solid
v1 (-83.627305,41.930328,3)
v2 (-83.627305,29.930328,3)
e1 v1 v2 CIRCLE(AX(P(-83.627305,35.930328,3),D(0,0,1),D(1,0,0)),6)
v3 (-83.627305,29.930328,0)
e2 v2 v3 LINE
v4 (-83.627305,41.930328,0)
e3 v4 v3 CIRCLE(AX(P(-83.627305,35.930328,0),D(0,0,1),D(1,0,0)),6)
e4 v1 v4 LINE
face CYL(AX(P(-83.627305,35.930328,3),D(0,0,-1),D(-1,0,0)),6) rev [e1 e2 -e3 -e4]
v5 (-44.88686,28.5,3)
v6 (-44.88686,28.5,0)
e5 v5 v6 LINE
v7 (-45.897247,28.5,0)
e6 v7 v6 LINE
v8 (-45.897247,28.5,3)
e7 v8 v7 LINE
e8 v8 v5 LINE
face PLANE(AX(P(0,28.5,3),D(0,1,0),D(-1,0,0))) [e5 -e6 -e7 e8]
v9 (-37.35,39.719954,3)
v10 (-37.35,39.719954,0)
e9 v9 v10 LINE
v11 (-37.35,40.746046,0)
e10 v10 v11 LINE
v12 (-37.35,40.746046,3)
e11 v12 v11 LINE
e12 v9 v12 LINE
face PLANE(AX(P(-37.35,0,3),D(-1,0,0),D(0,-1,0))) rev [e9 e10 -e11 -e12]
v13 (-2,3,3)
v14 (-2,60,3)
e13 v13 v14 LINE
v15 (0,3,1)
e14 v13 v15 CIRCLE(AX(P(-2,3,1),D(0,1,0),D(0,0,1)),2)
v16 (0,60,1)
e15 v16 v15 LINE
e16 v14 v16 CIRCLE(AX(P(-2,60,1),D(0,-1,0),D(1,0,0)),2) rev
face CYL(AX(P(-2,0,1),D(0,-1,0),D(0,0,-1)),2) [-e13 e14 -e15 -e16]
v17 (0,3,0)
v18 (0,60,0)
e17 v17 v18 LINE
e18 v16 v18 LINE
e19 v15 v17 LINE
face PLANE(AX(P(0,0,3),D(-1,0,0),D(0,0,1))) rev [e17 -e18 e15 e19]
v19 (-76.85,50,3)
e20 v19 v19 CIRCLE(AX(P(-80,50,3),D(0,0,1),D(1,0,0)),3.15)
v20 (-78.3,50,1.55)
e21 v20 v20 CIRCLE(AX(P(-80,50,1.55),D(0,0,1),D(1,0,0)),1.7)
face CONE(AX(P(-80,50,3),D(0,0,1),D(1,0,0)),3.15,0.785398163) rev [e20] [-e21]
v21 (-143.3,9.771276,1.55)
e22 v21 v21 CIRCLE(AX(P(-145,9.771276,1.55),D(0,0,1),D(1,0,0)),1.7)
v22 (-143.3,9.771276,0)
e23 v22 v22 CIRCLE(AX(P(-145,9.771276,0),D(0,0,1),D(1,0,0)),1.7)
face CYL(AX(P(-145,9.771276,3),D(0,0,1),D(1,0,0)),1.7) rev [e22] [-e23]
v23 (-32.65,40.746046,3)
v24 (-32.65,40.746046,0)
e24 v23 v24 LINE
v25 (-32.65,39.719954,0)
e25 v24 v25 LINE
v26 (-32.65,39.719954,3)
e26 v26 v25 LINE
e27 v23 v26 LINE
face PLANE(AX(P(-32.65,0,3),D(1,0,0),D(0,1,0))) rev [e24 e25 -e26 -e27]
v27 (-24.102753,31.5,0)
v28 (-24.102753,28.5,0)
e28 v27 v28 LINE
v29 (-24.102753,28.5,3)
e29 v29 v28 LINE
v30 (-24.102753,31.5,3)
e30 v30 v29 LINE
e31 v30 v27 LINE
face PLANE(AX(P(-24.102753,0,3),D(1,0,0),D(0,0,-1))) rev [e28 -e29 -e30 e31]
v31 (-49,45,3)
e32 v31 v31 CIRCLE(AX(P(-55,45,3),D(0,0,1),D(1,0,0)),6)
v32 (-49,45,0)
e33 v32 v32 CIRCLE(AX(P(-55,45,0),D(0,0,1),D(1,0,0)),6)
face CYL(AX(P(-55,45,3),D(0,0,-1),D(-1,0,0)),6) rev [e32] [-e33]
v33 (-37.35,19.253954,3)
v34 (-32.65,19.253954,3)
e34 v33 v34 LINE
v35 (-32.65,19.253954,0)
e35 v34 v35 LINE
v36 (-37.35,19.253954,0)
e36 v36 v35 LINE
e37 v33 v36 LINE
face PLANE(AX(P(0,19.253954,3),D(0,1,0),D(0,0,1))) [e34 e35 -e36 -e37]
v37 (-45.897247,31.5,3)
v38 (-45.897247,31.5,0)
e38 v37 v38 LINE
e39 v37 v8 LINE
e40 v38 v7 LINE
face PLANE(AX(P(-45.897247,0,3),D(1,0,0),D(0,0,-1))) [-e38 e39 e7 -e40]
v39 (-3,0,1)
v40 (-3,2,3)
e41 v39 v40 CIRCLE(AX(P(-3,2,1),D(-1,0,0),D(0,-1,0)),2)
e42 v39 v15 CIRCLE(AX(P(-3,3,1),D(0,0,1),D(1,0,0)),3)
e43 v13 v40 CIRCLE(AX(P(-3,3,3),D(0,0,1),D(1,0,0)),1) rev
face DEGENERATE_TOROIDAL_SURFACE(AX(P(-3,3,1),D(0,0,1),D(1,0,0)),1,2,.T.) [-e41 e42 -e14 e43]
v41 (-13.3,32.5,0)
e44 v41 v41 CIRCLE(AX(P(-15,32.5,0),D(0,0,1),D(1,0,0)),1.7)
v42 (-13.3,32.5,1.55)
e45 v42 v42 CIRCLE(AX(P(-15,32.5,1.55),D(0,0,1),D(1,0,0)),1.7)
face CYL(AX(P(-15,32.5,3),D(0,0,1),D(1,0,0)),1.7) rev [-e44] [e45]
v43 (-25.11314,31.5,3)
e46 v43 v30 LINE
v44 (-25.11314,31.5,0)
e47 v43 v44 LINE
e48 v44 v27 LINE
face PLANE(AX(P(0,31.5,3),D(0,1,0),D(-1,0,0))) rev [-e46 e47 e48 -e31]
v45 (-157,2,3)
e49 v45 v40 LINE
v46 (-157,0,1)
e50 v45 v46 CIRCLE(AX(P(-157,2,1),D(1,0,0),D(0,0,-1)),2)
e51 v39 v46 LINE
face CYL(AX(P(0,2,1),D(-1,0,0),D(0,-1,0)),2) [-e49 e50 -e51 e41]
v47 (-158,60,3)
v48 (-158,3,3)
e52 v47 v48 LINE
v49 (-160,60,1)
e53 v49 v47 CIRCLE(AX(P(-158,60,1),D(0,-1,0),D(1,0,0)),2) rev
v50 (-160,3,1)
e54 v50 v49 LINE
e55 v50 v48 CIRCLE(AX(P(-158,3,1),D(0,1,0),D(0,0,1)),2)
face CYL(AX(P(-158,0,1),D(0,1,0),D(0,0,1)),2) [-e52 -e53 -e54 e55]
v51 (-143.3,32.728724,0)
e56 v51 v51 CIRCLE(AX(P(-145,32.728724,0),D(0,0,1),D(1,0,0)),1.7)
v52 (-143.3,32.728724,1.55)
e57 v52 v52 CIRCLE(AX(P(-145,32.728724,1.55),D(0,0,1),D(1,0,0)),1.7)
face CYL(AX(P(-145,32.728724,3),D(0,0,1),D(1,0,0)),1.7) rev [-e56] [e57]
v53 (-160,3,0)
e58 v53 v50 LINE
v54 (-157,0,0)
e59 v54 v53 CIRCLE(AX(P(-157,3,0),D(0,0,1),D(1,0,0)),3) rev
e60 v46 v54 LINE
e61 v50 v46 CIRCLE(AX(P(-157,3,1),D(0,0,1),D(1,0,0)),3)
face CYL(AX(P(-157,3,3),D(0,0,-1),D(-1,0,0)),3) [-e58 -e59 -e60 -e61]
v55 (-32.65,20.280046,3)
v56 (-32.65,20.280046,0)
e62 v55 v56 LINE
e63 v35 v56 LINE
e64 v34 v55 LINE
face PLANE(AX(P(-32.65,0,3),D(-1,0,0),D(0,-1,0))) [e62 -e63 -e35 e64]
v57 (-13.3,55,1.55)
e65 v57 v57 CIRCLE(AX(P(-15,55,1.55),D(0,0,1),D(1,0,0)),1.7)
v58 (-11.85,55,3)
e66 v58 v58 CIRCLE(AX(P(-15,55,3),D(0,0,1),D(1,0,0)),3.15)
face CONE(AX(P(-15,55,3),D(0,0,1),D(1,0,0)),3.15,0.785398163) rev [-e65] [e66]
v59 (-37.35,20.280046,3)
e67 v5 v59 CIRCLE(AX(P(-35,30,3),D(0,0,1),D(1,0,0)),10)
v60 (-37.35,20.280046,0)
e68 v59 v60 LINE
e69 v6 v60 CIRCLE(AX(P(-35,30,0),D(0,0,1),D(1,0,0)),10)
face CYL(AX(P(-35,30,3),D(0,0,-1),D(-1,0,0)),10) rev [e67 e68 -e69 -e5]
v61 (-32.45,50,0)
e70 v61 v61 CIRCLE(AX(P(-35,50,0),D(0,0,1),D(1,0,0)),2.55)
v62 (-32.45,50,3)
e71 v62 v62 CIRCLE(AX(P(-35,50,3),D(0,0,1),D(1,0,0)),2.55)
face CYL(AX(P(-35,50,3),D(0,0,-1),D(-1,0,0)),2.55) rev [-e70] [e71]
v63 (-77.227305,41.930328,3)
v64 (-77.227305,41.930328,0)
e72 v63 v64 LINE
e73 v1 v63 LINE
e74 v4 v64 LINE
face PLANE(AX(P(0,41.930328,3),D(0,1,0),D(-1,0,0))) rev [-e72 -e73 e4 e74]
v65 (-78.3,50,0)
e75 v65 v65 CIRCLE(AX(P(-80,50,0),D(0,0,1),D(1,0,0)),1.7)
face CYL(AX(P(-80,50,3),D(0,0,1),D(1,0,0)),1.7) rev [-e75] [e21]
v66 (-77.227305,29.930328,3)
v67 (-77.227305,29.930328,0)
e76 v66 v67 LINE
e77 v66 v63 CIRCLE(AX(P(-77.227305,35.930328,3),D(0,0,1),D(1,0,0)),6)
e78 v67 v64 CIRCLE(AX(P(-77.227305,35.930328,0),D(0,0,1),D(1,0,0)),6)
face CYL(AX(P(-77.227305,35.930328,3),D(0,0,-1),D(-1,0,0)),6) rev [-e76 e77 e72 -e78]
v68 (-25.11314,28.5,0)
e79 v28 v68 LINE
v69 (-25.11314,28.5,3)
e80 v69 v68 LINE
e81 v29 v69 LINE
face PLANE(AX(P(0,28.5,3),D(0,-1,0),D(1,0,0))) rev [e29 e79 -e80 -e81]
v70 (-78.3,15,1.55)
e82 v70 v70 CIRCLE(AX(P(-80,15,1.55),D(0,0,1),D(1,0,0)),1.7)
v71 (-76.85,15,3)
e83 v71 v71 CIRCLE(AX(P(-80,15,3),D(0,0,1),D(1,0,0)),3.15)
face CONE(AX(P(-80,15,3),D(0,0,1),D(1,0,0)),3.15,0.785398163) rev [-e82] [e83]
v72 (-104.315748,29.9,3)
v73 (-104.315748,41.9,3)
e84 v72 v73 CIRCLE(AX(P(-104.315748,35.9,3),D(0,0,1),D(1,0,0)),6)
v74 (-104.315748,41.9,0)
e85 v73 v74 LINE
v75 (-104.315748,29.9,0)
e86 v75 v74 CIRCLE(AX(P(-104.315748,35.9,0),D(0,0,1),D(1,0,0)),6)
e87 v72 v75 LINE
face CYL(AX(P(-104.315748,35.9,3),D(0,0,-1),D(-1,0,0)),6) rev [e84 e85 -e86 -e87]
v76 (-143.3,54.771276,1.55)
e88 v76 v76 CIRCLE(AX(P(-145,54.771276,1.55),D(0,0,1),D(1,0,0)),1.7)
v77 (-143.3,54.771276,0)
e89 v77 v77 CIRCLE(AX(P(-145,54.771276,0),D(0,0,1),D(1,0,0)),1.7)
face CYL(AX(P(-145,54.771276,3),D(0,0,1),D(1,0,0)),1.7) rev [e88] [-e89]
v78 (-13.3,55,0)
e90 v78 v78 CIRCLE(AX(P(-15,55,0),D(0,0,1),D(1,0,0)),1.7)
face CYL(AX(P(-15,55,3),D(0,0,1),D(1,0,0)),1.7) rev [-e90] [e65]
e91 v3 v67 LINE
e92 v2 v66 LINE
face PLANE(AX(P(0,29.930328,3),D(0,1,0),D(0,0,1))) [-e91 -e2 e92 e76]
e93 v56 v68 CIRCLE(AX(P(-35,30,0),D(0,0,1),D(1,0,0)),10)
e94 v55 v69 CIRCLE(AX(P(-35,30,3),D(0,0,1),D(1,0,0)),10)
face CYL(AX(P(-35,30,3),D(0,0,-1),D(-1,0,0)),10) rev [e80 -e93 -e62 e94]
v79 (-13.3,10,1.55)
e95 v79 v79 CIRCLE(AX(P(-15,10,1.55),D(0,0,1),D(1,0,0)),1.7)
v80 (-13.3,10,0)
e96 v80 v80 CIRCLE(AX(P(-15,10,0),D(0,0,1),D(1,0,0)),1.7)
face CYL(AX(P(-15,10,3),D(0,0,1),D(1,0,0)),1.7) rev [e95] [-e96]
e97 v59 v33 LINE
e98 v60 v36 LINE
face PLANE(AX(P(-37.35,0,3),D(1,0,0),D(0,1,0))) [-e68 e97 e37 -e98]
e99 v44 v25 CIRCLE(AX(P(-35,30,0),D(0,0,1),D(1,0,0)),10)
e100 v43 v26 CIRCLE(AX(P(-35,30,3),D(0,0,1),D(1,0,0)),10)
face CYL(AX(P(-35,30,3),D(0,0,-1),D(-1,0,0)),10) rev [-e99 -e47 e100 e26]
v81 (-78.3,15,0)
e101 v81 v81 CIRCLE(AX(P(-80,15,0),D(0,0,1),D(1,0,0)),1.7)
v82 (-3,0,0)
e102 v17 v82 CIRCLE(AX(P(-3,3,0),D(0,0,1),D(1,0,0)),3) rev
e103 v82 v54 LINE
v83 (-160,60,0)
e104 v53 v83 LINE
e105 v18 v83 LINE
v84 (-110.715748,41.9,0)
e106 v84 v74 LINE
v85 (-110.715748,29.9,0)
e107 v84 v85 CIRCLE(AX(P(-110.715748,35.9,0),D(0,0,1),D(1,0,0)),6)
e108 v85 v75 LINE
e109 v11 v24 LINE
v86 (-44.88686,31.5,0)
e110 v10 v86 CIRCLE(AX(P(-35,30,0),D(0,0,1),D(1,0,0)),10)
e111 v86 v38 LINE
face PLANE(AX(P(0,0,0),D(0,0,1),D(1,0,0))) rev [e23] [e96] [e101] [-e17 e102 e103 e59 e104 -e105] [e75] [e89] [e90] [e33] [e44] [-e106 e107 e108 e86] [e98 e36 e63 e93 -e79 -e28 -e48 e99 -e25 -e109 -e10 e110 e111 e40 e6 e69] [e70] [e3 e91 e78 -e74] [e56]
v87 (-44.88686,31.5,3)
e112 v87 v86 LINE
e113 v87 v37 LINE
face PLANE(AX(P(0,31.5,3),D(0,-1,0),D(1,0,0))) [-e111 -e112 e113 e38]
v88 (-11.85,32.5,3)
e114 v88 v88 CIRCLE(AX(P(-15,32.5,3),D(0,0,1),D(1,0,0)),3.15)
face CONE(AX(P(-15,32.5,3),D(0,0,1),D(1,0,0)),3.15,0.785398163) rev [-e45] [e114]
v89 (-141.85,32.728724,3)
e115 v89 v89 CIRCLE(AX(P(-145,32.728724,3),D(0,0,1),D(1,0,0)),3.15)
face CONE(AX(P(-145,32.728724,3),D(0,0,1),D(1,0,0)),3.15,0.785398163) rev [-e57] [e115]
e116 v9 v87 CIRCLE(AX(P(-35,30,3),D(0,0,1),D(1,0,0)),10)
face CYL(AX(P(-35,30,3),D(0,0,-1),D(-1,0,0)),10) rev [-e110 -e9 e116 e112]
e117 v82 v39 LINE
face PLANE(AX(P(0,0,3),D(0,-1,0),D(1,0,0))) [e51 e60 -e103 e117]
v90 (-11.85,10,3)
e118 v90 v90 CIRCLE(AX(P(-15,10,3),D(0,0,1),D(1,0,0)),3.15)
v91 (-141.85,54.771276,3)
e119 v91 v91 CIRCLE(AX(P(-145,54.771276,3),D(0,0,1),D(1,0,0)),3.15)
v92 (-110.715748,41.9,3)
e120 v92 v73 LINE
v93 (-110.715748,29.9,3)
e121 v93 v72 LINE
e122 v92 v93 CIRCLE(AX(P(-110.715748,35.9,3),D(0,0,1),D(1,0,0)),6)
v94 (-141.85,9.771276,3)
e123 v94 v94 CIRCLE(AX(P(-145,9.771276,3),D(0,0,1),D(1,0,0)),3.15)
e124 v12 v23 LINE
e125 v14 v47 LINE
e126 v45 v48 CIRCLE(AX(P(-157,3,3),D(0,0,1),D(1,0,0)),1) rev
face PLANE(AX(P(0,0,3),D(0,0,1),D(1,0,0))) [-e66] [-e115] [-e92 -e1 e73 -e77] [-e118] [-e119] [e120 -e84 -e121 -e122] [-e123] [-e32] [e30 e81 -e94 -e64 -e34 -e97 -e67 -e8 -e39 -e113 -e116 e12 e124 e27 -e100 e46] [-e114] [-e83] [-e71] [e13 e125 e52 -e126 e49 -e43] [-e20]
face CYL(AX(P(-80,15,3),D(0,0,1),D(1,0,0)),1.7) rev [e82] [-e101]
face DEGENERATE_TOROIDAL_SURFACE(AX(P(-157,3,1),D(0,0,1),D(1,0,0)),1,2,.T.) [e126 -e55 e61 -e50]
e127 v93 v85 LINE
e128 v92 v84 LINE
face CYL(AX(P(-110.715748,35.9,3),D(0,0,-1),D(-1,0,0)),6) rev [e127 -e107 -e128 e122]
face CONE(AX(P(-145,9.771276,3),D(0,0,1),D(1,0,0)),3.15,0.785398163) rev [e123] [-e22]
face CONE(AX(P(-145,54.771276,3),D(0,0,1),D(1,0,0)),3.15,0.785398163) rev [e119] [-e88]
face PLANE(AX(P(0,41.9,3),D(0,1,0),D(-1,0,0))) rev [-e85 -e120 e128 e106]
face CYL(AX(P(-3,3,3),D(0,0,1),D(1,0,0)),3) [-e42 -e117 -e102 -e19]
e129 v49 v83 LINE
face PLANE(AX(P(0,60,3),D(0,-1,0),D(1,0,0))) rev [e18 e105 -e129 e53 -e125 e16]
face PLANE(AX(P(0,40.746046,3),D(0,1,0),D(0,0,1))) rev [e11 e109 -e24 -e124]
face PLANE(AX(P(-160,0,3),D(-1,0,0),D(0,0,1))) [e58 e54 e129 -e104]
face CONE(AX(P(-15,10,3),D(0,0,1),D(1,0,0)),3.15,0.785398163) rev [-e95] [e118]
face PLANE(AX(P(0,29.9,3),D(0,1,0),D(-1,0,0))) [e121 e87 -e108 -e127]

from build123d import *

# Parameters (mm, degrees)
SKETCH11_W                                     = 160
SKETCH11_H                                     = 60
SKETCH11_R                                     = 2.55
SKETCH11_R_2                                   = 6
BOSS_EXTRUDE1_DEPTH                            = 3
FILLET1_R                                      = 2
FILLET3_R                                      = 3
CSK_FOR_M3_FLAT_HEAD_MACHINE_SCREW1_AT_2_COUNT = 2
CSK_FOR_M3_FLAT_HEAD_MACHINE_SCREW1_AT_2_PITCH = 22.042551394
CSK_FOR_M3_FLAT_HEAD_MACHINE_SCREW1_AT_3_COUNT = 2
CSK_FOR_M3_FLAT_HEAD_MACHINE_SCREW1_AT_3_PITCH = 45
CSK_FOR_M3_FLAT_HEAD_MACHINE_SCREW1_AT_4_COUNT = 2
CSK_FOR_M3_FLAT_HEAD_MACHINE_SCREW1_AT_4_PITCH = 137.493516675
CSK_FOR_M3_FLAT_HEAD_MACHINE_SCREW1_AT_5_COUNT = 2
CSK_FOR_M3_FLAT_HEAD_MACHINE_SCREW1_AT_5_PITCH = 131.893933603
CSK_FOR_M3_FLAT_HEAD_MACHINE_SCREW1_AT_6_COUNT = 2
CSK_FOR_M3_FLAT_HEAD_MACHINE_SCREW1_AT_6_PITCH = 130.000201211
CSK_FOR_M3_FLAT_HEAD_MACHINE_SCREW1_AT_7_COUNT = 2
CSK_FOR_M3_FLAT_HEAD_MACHINE_SCREW1_AT_7_PITCH = 65.174880681
CSK_FOR_M3_FLAT_HEAD_MACHINE_SCREW1_AT_8_COUNT = 2
CSK_FOR_M3_FLAT_HEAD_MACHINE_SCREW1_AT_8_PITCH = 76.202062771


with BuildPart() as part:
    # Sketch11 → Boss-Extrude1 (new body)
    with BuildSketch(Plane.XY):
        with Locations((-80, 30)):
            Rectangle(SKETCH11_W, SKETCH11_H)
        with Locations((-35, 50)):
            Circle(SKETCH11_R, mode=Mode.SUBTRACT)
        with Locations((-55, 45)):
            Circle(SKETCH11_R_2, mode=Mode.SUBTRACT)
        with BuildLine():
            Line((-44.886859967, 31.5), (-45.897247359, 31.5))
            Line((-45.897247359, 31.5), (-45.897247359, 28.5))
            Line((-45.897247359, 28.5), (-44.886859967, 28.5))
            ThreePointArc((-44.886859967, 28.5), (-42.370691635, 23.241826814), (-37.35, 20.280046296))
            Line((-37.35, 20.280046296), (-37.35, 19.253954216))
            Line((-37.35, 19.253954216), (-32.65, 19.253954216))
            Line((-32.65, 19.253954216), (-32.65, 20.280046296))
            ThreePointArc((-32.65, 20.280046296), (-27.629308365, 23.241826814), (-25.113140033, 28.5))
            Line((-25.113140033, 28.5), (-24.102752641, 28.5))
            Line((-24.102752641, 28.5), (-24.102752641, 31.5))
            Line((-24.102752641, 31.5), (-25.113140033, 31.5))
            ThreePointArc((-25.113140033, 31.5), (-27.629308365, 36.758173186), (-32.65, 39.719953704))
            Line((-32.65, 39.719953704), (-32.65, 40.746045784))
            Line((-32.65, 40.746045784), (-37.35, 40.746045784))
            Line((-37.35, 40.746045784), (-37.35, 39.719953704))
            ThreePointArc((-37.35, 39.719953704), (-42.370691635, 36.758173186), (-44.886859967, 31.5))
        make_face(mode=Mode.SUBTRACT)
        with BuildLine():
            Line((-83.627304882, 41.930328357), (-77.227304882, 41.930328357))
            ThreePointArc((-77.227304882, 41.930328357), (-71.227304882, 35.930328357), (-77.227304882, 29.930328357))
            Line((-77.227304882, 29.930328357), (-83.627304882, 29.930328357))
            ThreePointArc((-83.627304882, 29.930328357), (-89.627304882, 35.930328357), (-83.627304882, 41.930328357))
        make_face(mode=Mode.SUBTRACT)
        with BuildLine():
            Line((-110.715747539, 41.9), (-104.315747539, 41.9))
            ThreePointArc((-104.315747539, 41.9), (-98.315747539, 35.9), (-104.315747539, 29.9))
            Line((-104.315747539, 29.9), (-110.715747539, 29.9))
            ThreePointArc((-110.715747539, 29.9), (-116.715747539, 35.9), (-110.715747539, 41.9))
        make_face(mode=Mode.SUBTRACT)
    extrude(amount=BOSS_EXTRUDE1_DEPTH)

    # Fillet1
    fillet1_edges = [part.edges().sort_by_distance(p)[0] for p in [
        (-160, 30, 3),
        (-80, 0, 3),
        (0, 30, 3),
    ]]
    fillet(fillet1_edges, radius=FILLET1_R)

    # Fillet3
    # the kernel refuses this fillet: 3 mm, written as the material it takes off along each edge
    with BuildSketch(Plane(origin=(-3, 3, 3), x_dir=(0, -1, 0), z_dir=(-1, 0, 0))) as fillet3_piece_1:
        with BuildLine():
            CenterArc((1, -2), 2, 0, 90)
            Line((3, -2), (3, 0))
            Line((3, 0), (1, 0))
        make_face()
    revolve(axis=Axis((-3, 3, 3), (0, 0, 1)), revolution_arc=90, mode=Mode.SUBTRACT)
    with BuildSketch(Plane(origin=(-157, 3, 3), x_dir=(-1, 0, 0), z_dir=(0, 1, 0))) as fillet3_piece_2:
        with BuildLine():
            CenterArc((1, -2), 2, 0, 90)
            Line((3, -2), (3, 0))
            Line((3, 0), (1, 0))
        make_face()
    revolve(axis=Axis((-157, 3, 3), (0, 0, 1)), revolution_arc=90, mode=Mode.SUBTRACT)
    with BuildSketch(Plane(origin=(0, 0, -7.5), x_dir=(-1, 0, 0), z_dir=(0, 0, 1))) as fillet3_piece_3:
        with BuildLine():
            CenterArc((FILLET3_R, -FILLET3_R), FILLET3_R, 90, 90)
            Line((0, -FILLET3_R), (0, 0))
            Line((0, 0), (FILLET3_R, 0))
        make_face()
    extrude(amount=10.5, mode=Mode.SUBTRACT)
    with BuildSketch(Plane(origin=(-160, 0, -7.5), x_dir=(1, 0, 0), z_dir=(0, 0, 1))) as fillet3_piece_4:
        with BuildLine():
            CenterArc((FILLET3_R, FILLET3_R), FILLET3_R, 180, 90)
            Line((0, FILLET3_R), (0, 0))
            Line((0, 0), (FILLET3_R, 0))
        make_face()
    extrude(amount=10.5, mode=Mode.SUBTRACT)

    # Sketch13 → CSK for M3 Flat Head Machine Screw1 (revolve, cut)
    with BuildSketch(Plane(origin=(-145, 54.771275697, 3), x_dir=(0, -1, 0), z_dir=(1, 0, 0))):
        Polygon((0, 0), (0, 3), (1.7, 3), (1.7, 1.45), (3.15, 0), align=None)
    csk_for_m3_flat_head_machine_screw1 = revolve(axis=Axis((-145, 54.771275697, 9.35), (0, 0, -1)), mode=Mode.SUBTRACT)

    # CSK for M3 Flat Head Machine Screw1 at 2: CSK for M3 Flat Head Machine Screw1 ×2
    with Locations(*[(0, -i * CSK_FOR_M3_FLAT_HEAD_MACHINE_SCREW1_AT_2_PITCH, 0) for i in range(1, CSK_FOR_M3_FLAT_HEAD_MACHINE_SCREW1_AT_2_COUNT)]):
        add(csk_for_m3_flat_head_machine_screw1, mode=Mode.SUBTRACT)

    # CSK for M3 Flat Head Machine Screw1 at 3: CSK for M3 Flat Head Machine Screw1 ×2
    with Locations(*[(0, -i * CSK_FOR_M3_FLAT_HEAD_MACHINE_SCREW1_AT_3_PITCH, 0) for i in range(1, CSK_FOR_M3_FLAT_HEAD_MACHINE_SCREW1_AT_3_COUNT)]):
        add(csk_for_m3_flat_head_machine_screw1, mode=Mode.SUBTRACT)

    # CSK for M3 Flat Head Machine Screw1 at 4: CSK for M3 Flat Head Machine Screw1 ×2
    with Locations(*[Vector(0.9454991271168814, -0.32562463147190707, 0) * (i * CSK_FOR_M3_FLAT_HEAD_MACHINE_SCREW1_AT_4_PITCH) for i in range(1, CSK_FOR_M3_FLAT_HEAD_MACHINE_SCREW1_AT_4_COUNT)]):
        add(csk_for_m3_flat_head_machine_screw1, mode=Mode.SUBTRACT)

    # CSK for M3 Flat Head Machine Screw1 at 5: CSK for M3 Flat Head Machine Screw1 ×2
    with Locations(*[Vector(0.9856404798092461, -0.16885746818367017, 0) * (i * CSK_FOR_M3_FLAT_HEAD_MACHINE_SCREW1_AT_5_PITCH) for i in range(1, CSK_FOR_M3_FLAT_HEAD_MACHINE_SCREW1_AT_5_COUNT)]):
        add(csk_for_m3_flat_head_machine_screw1, mode=Mode.SUBTRACT)

    # CSK for M3 Flat Head Machine Screw1 at 6: CSK for M3 Flat Head Machine Screw1 ×2
    with Locations(*[Vector(0.9999984522282437, 0.001759414992816724, 0) * (i * CSK_FOR_M3_FLAT_HEAD_MACHINE_SCREW1_AT_6_PITCH) for i in range(1, CSK_FOR_M3_FLAT_HEAD_MACHINE_SCREW1_AT_6_COUNT)]):
        add(csk_for_m3_flat_head_machine_screw1, mode=Mode.SUBTRACT)

    # CSK for M3 Flat Head Machine Screw1 at 7: CSK for M3 Flat Head Machine Screw1 ×2
    with Locations(*[Vector(0.997316747201951, -0.07320727935472046, 0) * (i * CSK_FOR_M3_FLAT_HEAD_MACHINE_SCREW1_AT_7_PITCH) for i in range(1, CSK_FOR_M3_FLAT_HEAD_MACHINE_SCREW1_AT_7_COUNT)]):
        add(csk_for_m3_flat_head_machine_screw1, mode=Mode.SUBTRACT)

    # CSK for M3 Flat Head Machine Screw1 at 8: CSK for M3 Flat Head Machine Screw1 ×2
    with Locations(*[Vector(0.8529952817065795, -0.5219186233373103, 0) * (i * CSK_FOR_M3_FLAT_HEAD_MACHINE_SCREW1_AT_8_PITCH) for i in range(1, CSK_FOR_M3_FLAT_HEAD_MACHINE_SCREW1_AT_8_COUNT)]):
        add(csk_for_m3_flat_head_machine_screw1, mode=Mode.SUBTRACT)


solid = part.part
